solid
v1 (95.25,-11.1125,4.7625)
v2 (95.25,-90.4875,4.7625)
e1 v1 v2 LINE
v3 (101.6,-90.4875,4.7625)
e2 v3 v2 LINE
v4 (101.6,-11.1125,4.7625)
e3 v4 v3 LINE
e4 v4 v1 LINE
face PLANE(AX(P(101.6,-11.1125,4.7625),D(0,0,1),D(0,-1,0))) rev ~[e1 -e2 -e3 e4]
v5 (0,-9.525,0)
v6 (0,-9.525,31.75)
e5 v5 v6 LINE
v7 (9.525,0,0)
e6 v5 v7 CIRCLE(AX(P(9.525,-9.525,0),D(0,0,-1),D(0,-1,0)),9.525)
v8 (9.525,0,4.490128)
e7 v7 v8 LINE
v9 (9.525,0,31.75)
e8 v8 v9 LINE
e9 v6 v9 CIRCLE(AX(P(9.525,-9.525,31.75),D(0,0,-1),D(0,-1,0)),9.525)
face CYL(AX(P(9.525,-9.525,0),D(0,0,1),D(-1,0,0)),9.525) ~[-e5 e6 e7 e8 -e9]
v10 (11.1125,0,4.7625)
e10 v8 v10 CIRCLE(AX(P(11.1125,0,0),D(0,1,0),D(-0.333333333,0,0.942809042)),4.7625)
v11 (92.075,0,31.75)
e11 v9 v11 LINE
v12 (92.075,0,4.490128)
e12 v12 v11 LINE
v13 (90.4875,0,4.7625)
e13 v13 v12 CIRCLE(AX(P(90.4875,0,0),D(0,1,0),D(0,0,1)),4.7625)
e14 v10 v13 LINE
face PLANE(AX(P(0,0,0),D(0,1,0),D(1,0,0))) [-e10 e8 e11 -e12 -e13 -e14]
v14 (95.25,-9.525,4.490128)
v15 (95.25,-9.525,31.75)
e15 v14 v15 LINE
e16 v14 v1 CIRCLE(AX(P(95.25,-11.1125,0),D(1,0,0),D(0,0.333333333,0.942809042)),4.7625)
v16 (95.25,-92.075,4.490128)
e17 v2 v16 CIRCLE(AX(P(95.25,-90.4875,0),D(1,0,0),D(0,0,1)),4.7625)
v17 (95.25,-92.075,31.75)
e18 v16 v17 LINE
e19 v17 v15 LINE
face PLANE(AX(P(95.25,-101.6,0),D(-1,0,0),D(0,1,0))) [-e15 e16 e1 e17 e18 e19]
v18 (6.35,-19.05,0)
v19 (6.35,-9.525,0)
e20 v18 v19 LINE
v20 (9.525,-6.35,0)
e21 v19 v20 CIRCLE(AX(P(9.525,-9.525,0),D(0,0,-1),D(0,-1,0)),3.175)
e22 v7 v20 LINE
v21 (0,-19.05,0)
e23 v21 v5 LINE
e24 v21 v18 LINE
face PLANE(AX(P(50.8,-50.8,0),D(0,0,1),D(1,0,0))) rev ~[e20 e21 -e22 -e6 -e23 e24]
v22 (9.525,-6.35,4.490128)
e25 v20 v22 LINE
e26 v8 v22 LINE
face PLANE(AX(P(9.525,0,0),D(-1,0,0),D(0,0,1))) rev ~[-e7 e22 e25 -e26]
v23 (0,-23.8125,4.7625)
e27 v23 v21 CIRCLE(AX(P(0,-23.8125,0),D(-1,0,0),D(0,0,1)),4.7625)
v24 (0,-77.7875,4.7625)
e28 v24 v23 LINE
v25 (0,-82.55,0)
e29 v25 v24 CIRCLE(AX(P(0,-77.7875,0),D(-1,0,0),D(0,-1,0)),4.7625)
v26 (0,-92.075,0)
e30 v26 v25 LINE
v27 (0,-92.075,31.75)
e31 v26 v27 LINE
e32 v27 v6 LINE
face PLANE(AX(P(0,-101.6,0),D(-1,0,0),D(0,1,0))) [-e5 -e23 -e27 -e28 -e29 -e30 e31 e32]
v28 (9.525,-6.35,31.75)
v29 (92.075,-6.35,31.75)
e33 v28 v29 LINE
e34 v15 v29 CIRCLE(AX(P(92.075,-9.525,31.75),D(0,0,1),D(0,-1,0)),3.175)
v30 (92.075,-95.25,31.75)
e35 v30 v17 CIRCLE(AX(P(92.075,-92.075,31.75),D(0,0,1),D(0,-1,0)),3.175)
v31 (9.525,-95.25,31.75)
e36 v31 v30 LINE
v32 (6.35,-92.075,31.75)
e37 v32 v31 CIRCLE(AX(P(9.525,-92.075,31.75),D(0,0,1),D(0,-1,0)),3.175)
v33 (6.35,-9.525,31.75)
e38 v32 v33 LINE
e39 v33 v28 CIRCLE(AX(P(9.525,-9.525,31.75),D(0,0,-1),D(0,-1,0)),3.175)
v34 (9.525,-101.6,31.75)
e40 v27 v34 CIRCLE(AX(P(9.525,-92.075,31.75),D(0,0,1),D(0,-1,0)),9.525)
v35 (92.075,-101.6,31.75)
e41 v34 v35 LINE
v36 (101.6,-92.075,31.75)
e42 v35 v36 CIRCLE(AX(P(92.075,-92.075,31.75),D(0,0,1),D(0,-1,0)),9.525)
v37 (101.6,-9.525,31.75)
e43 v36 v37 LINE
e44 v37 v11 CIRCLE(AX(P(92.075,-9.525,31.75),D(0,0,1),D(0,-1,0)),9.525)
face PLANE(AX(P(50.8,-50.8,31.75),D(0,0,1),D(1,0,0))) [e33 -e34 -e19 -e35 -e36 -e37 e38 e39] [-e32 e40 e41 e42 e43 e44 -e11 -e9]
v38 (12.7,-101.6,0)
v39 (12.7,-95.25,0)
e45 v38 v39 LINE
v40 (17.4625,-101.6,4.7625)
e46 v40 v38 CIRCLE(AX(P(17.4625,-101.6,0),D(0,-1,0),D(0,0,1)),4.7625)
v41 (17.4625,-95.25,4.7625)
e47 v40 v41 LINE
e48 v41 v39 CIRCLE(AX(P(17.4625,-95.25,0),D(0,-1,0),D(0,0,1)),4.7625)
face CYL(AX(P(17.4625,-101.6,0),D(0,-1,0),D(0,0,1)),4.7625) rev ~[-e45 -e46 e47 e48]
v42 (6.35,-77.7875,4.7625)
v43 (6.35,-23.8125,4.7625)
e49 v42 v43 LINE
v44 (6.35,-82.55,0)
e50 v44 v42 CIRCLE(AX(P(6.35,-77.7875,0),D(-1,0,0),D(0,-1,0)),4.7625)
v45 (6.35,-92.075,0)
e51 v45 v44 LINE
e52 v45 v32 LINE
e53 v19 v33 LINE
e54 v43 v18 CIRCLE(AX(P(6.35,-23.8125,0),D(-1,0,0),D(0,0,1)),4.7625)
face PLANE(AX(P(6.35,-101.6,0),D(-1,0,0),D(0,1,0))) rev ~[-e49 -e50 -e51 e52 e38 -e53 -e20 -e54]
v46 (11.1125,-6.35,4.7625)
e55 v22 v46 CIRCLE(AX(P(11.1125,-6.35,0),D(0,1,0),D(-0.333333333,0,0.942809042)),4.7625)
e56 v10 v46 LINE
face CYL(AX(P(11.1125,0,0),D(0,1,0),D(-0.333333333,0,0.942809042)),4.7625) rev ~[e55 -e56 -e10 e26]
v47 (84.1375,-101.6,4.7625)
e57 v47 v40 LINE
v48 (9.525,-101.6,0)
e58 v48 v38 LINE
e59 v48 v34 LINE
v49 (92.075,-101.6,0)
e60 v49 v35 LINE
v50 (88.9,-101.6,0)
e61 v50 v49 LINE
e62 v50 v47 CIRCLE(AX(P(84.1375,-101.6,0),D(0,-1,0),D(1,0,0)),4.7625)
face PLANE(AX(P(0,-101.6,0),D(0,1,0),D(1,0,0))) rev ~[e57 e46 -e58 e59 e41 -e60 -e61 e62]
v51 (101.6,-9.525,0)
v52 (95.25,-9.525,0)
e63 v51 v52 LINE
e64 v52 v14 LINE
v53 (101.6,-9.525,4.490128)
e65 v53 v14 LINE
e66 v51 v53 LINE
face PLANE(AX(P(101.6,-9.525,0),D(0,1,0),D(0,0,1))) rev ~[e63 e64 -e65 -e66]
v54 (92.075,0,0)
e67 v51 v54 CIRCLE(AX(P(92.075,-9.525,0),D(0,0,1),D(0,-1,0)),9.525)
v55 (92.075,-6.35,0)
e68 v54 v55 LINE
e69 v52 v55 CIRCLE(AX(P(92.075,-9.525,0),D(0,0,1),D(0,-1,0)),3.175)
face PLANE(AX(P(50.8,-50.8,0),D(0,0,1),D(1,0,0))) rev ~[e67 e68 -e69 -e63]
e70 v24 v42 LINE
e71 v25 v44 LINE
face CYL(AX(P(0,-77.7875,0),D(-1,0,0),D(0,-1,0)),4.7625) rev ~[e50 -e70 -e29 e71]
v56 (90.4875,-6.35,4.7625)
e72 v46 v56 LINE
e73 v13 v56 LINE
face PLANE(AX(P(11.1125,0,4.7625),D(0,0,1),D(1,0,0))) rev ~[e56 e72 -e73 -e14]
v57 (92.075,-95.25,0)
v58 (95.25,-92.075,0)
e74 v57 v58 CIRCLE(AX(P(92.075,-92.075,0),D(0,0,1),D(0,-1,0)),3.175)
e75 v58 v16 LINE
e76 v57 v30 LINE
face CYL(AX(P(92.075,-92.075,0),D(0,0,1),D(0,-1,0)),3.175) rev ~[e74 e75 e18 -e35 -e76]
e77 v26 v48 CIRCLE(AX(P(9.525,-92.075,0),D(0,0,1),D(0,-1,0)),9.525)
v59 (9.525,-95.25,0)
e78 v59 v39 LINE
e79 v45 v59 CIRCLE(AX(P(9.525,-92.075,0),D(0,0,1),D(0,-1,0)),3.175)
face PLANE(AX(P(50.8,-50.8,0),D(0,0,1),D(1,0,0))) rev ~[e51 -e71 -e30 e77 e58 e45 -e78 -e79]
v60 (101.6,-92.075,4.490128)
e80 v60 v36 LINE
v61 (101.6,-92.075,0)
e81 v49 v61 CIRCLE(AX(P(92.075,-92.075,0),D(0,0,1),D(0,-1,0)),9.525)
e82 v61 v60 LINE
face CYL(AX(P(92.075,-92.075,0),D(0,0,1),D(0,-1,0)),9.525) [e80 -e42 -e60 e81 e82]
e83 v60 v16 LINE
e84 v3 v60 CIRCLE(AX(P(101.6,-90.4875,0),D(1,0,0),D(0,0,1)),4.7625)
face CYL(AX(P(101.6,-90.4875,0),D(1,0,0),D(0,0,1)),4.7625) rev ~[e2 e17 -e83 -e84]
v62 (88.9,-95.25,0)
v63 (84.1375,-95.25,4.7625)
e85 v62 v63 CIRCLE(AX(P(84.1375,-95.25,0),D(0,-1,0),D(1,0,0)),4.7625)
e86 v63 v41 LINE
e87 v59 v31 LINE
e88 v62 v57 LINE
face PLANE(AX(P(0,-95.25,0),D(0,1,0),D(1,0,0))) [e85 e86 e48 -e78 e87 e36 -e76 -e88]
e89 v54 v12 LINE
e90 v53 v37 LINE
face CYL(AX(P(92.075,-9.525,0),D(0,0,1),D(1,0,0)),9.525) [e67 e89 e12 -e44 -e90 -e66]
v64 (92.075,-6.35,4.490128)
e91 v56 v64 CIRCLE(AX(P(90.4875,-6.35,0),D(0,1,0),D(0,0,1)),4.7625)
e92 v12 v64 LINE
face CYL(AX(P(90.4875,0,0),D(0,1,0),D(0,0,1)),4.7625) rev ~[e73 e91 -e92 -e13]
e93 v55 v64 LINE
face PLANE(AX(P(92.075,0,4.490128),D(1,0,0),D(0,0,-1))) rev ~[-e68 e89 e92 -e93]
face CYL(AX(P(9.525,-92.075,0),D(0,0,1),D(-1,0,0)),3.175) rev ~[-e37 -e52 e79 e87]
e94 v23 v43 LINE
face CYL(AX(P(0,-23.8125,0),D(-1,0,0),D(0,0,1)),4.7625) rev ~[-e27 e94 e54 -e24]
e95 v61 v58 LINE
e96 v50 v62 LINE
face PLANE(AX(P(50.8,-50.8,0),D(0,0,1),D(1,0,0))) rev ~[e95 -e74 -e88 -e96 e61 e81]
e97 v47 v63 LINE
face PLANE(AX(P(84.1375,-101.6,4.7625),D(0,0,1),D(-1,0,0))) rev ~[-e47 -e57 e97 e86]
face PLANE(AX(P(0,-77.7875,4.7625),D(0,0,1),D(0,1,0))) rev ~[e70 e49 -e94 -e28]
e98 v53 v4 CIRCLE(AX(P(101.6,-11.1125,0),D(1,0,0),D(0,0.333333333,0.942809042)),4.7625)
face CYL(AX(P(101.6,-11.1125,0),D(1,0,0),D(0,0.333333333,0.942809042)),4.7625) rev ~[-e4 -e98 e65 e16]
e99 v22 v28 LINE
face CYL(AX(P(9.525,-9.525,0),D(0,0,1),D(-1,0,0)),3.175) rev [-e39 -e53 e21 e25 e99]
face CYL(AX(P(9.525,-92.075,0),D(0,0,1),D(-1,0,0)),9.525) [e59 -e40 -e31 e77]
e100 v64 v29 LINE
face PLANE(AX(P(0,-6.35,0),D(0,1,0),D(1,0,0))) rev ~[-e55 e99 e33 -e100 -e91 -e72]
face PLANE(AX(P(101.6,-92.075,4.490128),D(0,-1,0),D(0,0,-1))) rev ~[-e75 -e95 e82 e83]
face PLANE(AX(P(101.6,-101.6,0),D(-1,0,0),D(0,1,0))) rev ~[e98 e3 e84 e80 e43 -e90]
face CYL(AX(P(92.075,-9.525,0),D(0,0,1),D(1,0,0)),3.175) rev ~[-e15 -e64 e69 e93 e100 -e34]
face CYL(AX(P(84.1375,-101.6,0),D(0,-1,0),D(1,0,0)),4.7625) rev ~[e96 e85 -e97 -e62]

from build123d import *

# Parameters (mm, degrees)
F0_W      = 101.6
F0_H      = 101.6
F1_DEPTH  = 31.75
F2_R      = 9.525
F3_T      = -6.35
F8_DEPTH  = 6.35
F9_DEPTH  = 6.35
F10_DEPTH = 6.35
F11_DEPTH = 6.35


# Not quite as in the source:
# - a feature names something its author has since deleted; it is built from what else it names


with BuildPart() as f1:
    # F0 (on Top) → F1 (new body)
    with BuildSketch(Plane.XY):
        with Locations((50.8, -50.8)):
            Rectangle(F0_W, F0_H)
    extrude(amount=F1_DEPTH)

    # F2
    f2_edges = [f1.edges().sort_by_distance(p)[0] for p in [
        (0, -101.6, 15.875),
        (0, 0, 15.875),
        (101.6, 0, 15.875),
        (101.6, -101.6, 15.875),
    ]]
    fillet(f2_edges, radius=F2_R)

    # F3
    f3_openings = [f1.faces().sort_by_distance(p)[0] for p in [
        (50.8, -50.8, 0),
        (50.8, -50.8, 31.75),
    ]]
    offset(amount=F3_T, openings=f3_openings)

    # F6 (on face) → F8 (cut, through all)
    with BuildSketch(Plane(origin=(0, 0, 0), x_dir=(-1, 0, 0), z_dir=(0, 1, 0))):
        with BuildLine():
            Line((-50.8, 4.7625), (-90.4875, 4.7625))
            ThreePointArc((-90.4875, 4.7625), (-91.2928481737, 4.6939131403), (-92.075, 4.4901280605))
            Line((-92.075, 4.4901280605), (-92.075, 0))
            Line((-92.075, 0), (-9.525, 0))
            Line((-9.525, 0), (-9.525, 4.4901280605))
            ThreePointArc((-9.525, 4.4901280605), (-10.3071518263, 4.6939131403), (-11.1125, 4.7625))
            Line((-11.1125, 4.7625), (-50.8, 4.7625))
        make_face()
    extrude(amount=-F8_DEPTH, mode=Mode.SUBTRACT)

    # F7 (on face) → F9 (cut, through all)
    with BuildSketch(Plane.YZ.offset(101.6)):
        with BuildLine():
            Line((-50.8, 4.7625), (-90.4875, 4.7625))
            ThreePointArc((-90.4875, 4.7625), (-91.2928481737, 4.6939131403), (-92.075, 4.4901280605))
            Line((-92.075, 4.4901280605), (-92.075, 0))
            Line((-92.075, 0), (-9.525, 0))
            Line((-9.525, 0), (-9.525, 4.4901280605))
            ThreePointArc((-9.525, 4.4901280605), (-10.3071518263, 4.6939131403), (-11.1125, 4.7625))
            Line((-11.1125, 4.7625), (-50.8, 4.7625))
        make_face()
    extrude(amount=-F9_DEPTH, mode=Mode.SUBTRACT)

    # F4 (on face) → F10 (cut, through all)
    with BuildSketch(Plane.XZ.offset(101.6)):
        with BuildLine():
            Line((50.8, 4.7625), (17.4625, 4.7625))
            ThreePointArc((17.4625, 4.7625), (14.0949039546, 3.3675960454), (12.7, 0))
            Line((12.7, 0), (88.9, 0))
            ThreePointArc((88.9, 0), (87.5050960454, 3.3675960454), (84.1375, 4.7625))
            Line((84.1375, 4.7625), (50.8, 4.7625))
        make_face()
    extrude(amount=-F10_DEPTH, mode=Mode.SUBTRACT)

    # F5 (on face) → F11 (cut, through all)
    with BuildSketch(Plane(origin=(0, 0, 0), x_dir=(0, -1, 0), z_dir=(-1, 0, 0))):
        with BuildLine():
            Line((50.8, 4.7625), (23.8125, 4.7625))
            ThreePointArc((23.8125, 4.7625), (20.4449039546, 3.3675960454), (19.05, 0))
            Line((19.05, 0), (82.55, 0))
            ThreePointArc((82.55, 0), (81.1550960454, 3.3675960454), (77.7875, 4.7625))
            Line((77.7875, 4.7625), (50.8, 4.7625))
        make_face()
    extrude(amount=-F11_DEPTH, mode=Mode.SUBTRACT)


solid = f1.part
